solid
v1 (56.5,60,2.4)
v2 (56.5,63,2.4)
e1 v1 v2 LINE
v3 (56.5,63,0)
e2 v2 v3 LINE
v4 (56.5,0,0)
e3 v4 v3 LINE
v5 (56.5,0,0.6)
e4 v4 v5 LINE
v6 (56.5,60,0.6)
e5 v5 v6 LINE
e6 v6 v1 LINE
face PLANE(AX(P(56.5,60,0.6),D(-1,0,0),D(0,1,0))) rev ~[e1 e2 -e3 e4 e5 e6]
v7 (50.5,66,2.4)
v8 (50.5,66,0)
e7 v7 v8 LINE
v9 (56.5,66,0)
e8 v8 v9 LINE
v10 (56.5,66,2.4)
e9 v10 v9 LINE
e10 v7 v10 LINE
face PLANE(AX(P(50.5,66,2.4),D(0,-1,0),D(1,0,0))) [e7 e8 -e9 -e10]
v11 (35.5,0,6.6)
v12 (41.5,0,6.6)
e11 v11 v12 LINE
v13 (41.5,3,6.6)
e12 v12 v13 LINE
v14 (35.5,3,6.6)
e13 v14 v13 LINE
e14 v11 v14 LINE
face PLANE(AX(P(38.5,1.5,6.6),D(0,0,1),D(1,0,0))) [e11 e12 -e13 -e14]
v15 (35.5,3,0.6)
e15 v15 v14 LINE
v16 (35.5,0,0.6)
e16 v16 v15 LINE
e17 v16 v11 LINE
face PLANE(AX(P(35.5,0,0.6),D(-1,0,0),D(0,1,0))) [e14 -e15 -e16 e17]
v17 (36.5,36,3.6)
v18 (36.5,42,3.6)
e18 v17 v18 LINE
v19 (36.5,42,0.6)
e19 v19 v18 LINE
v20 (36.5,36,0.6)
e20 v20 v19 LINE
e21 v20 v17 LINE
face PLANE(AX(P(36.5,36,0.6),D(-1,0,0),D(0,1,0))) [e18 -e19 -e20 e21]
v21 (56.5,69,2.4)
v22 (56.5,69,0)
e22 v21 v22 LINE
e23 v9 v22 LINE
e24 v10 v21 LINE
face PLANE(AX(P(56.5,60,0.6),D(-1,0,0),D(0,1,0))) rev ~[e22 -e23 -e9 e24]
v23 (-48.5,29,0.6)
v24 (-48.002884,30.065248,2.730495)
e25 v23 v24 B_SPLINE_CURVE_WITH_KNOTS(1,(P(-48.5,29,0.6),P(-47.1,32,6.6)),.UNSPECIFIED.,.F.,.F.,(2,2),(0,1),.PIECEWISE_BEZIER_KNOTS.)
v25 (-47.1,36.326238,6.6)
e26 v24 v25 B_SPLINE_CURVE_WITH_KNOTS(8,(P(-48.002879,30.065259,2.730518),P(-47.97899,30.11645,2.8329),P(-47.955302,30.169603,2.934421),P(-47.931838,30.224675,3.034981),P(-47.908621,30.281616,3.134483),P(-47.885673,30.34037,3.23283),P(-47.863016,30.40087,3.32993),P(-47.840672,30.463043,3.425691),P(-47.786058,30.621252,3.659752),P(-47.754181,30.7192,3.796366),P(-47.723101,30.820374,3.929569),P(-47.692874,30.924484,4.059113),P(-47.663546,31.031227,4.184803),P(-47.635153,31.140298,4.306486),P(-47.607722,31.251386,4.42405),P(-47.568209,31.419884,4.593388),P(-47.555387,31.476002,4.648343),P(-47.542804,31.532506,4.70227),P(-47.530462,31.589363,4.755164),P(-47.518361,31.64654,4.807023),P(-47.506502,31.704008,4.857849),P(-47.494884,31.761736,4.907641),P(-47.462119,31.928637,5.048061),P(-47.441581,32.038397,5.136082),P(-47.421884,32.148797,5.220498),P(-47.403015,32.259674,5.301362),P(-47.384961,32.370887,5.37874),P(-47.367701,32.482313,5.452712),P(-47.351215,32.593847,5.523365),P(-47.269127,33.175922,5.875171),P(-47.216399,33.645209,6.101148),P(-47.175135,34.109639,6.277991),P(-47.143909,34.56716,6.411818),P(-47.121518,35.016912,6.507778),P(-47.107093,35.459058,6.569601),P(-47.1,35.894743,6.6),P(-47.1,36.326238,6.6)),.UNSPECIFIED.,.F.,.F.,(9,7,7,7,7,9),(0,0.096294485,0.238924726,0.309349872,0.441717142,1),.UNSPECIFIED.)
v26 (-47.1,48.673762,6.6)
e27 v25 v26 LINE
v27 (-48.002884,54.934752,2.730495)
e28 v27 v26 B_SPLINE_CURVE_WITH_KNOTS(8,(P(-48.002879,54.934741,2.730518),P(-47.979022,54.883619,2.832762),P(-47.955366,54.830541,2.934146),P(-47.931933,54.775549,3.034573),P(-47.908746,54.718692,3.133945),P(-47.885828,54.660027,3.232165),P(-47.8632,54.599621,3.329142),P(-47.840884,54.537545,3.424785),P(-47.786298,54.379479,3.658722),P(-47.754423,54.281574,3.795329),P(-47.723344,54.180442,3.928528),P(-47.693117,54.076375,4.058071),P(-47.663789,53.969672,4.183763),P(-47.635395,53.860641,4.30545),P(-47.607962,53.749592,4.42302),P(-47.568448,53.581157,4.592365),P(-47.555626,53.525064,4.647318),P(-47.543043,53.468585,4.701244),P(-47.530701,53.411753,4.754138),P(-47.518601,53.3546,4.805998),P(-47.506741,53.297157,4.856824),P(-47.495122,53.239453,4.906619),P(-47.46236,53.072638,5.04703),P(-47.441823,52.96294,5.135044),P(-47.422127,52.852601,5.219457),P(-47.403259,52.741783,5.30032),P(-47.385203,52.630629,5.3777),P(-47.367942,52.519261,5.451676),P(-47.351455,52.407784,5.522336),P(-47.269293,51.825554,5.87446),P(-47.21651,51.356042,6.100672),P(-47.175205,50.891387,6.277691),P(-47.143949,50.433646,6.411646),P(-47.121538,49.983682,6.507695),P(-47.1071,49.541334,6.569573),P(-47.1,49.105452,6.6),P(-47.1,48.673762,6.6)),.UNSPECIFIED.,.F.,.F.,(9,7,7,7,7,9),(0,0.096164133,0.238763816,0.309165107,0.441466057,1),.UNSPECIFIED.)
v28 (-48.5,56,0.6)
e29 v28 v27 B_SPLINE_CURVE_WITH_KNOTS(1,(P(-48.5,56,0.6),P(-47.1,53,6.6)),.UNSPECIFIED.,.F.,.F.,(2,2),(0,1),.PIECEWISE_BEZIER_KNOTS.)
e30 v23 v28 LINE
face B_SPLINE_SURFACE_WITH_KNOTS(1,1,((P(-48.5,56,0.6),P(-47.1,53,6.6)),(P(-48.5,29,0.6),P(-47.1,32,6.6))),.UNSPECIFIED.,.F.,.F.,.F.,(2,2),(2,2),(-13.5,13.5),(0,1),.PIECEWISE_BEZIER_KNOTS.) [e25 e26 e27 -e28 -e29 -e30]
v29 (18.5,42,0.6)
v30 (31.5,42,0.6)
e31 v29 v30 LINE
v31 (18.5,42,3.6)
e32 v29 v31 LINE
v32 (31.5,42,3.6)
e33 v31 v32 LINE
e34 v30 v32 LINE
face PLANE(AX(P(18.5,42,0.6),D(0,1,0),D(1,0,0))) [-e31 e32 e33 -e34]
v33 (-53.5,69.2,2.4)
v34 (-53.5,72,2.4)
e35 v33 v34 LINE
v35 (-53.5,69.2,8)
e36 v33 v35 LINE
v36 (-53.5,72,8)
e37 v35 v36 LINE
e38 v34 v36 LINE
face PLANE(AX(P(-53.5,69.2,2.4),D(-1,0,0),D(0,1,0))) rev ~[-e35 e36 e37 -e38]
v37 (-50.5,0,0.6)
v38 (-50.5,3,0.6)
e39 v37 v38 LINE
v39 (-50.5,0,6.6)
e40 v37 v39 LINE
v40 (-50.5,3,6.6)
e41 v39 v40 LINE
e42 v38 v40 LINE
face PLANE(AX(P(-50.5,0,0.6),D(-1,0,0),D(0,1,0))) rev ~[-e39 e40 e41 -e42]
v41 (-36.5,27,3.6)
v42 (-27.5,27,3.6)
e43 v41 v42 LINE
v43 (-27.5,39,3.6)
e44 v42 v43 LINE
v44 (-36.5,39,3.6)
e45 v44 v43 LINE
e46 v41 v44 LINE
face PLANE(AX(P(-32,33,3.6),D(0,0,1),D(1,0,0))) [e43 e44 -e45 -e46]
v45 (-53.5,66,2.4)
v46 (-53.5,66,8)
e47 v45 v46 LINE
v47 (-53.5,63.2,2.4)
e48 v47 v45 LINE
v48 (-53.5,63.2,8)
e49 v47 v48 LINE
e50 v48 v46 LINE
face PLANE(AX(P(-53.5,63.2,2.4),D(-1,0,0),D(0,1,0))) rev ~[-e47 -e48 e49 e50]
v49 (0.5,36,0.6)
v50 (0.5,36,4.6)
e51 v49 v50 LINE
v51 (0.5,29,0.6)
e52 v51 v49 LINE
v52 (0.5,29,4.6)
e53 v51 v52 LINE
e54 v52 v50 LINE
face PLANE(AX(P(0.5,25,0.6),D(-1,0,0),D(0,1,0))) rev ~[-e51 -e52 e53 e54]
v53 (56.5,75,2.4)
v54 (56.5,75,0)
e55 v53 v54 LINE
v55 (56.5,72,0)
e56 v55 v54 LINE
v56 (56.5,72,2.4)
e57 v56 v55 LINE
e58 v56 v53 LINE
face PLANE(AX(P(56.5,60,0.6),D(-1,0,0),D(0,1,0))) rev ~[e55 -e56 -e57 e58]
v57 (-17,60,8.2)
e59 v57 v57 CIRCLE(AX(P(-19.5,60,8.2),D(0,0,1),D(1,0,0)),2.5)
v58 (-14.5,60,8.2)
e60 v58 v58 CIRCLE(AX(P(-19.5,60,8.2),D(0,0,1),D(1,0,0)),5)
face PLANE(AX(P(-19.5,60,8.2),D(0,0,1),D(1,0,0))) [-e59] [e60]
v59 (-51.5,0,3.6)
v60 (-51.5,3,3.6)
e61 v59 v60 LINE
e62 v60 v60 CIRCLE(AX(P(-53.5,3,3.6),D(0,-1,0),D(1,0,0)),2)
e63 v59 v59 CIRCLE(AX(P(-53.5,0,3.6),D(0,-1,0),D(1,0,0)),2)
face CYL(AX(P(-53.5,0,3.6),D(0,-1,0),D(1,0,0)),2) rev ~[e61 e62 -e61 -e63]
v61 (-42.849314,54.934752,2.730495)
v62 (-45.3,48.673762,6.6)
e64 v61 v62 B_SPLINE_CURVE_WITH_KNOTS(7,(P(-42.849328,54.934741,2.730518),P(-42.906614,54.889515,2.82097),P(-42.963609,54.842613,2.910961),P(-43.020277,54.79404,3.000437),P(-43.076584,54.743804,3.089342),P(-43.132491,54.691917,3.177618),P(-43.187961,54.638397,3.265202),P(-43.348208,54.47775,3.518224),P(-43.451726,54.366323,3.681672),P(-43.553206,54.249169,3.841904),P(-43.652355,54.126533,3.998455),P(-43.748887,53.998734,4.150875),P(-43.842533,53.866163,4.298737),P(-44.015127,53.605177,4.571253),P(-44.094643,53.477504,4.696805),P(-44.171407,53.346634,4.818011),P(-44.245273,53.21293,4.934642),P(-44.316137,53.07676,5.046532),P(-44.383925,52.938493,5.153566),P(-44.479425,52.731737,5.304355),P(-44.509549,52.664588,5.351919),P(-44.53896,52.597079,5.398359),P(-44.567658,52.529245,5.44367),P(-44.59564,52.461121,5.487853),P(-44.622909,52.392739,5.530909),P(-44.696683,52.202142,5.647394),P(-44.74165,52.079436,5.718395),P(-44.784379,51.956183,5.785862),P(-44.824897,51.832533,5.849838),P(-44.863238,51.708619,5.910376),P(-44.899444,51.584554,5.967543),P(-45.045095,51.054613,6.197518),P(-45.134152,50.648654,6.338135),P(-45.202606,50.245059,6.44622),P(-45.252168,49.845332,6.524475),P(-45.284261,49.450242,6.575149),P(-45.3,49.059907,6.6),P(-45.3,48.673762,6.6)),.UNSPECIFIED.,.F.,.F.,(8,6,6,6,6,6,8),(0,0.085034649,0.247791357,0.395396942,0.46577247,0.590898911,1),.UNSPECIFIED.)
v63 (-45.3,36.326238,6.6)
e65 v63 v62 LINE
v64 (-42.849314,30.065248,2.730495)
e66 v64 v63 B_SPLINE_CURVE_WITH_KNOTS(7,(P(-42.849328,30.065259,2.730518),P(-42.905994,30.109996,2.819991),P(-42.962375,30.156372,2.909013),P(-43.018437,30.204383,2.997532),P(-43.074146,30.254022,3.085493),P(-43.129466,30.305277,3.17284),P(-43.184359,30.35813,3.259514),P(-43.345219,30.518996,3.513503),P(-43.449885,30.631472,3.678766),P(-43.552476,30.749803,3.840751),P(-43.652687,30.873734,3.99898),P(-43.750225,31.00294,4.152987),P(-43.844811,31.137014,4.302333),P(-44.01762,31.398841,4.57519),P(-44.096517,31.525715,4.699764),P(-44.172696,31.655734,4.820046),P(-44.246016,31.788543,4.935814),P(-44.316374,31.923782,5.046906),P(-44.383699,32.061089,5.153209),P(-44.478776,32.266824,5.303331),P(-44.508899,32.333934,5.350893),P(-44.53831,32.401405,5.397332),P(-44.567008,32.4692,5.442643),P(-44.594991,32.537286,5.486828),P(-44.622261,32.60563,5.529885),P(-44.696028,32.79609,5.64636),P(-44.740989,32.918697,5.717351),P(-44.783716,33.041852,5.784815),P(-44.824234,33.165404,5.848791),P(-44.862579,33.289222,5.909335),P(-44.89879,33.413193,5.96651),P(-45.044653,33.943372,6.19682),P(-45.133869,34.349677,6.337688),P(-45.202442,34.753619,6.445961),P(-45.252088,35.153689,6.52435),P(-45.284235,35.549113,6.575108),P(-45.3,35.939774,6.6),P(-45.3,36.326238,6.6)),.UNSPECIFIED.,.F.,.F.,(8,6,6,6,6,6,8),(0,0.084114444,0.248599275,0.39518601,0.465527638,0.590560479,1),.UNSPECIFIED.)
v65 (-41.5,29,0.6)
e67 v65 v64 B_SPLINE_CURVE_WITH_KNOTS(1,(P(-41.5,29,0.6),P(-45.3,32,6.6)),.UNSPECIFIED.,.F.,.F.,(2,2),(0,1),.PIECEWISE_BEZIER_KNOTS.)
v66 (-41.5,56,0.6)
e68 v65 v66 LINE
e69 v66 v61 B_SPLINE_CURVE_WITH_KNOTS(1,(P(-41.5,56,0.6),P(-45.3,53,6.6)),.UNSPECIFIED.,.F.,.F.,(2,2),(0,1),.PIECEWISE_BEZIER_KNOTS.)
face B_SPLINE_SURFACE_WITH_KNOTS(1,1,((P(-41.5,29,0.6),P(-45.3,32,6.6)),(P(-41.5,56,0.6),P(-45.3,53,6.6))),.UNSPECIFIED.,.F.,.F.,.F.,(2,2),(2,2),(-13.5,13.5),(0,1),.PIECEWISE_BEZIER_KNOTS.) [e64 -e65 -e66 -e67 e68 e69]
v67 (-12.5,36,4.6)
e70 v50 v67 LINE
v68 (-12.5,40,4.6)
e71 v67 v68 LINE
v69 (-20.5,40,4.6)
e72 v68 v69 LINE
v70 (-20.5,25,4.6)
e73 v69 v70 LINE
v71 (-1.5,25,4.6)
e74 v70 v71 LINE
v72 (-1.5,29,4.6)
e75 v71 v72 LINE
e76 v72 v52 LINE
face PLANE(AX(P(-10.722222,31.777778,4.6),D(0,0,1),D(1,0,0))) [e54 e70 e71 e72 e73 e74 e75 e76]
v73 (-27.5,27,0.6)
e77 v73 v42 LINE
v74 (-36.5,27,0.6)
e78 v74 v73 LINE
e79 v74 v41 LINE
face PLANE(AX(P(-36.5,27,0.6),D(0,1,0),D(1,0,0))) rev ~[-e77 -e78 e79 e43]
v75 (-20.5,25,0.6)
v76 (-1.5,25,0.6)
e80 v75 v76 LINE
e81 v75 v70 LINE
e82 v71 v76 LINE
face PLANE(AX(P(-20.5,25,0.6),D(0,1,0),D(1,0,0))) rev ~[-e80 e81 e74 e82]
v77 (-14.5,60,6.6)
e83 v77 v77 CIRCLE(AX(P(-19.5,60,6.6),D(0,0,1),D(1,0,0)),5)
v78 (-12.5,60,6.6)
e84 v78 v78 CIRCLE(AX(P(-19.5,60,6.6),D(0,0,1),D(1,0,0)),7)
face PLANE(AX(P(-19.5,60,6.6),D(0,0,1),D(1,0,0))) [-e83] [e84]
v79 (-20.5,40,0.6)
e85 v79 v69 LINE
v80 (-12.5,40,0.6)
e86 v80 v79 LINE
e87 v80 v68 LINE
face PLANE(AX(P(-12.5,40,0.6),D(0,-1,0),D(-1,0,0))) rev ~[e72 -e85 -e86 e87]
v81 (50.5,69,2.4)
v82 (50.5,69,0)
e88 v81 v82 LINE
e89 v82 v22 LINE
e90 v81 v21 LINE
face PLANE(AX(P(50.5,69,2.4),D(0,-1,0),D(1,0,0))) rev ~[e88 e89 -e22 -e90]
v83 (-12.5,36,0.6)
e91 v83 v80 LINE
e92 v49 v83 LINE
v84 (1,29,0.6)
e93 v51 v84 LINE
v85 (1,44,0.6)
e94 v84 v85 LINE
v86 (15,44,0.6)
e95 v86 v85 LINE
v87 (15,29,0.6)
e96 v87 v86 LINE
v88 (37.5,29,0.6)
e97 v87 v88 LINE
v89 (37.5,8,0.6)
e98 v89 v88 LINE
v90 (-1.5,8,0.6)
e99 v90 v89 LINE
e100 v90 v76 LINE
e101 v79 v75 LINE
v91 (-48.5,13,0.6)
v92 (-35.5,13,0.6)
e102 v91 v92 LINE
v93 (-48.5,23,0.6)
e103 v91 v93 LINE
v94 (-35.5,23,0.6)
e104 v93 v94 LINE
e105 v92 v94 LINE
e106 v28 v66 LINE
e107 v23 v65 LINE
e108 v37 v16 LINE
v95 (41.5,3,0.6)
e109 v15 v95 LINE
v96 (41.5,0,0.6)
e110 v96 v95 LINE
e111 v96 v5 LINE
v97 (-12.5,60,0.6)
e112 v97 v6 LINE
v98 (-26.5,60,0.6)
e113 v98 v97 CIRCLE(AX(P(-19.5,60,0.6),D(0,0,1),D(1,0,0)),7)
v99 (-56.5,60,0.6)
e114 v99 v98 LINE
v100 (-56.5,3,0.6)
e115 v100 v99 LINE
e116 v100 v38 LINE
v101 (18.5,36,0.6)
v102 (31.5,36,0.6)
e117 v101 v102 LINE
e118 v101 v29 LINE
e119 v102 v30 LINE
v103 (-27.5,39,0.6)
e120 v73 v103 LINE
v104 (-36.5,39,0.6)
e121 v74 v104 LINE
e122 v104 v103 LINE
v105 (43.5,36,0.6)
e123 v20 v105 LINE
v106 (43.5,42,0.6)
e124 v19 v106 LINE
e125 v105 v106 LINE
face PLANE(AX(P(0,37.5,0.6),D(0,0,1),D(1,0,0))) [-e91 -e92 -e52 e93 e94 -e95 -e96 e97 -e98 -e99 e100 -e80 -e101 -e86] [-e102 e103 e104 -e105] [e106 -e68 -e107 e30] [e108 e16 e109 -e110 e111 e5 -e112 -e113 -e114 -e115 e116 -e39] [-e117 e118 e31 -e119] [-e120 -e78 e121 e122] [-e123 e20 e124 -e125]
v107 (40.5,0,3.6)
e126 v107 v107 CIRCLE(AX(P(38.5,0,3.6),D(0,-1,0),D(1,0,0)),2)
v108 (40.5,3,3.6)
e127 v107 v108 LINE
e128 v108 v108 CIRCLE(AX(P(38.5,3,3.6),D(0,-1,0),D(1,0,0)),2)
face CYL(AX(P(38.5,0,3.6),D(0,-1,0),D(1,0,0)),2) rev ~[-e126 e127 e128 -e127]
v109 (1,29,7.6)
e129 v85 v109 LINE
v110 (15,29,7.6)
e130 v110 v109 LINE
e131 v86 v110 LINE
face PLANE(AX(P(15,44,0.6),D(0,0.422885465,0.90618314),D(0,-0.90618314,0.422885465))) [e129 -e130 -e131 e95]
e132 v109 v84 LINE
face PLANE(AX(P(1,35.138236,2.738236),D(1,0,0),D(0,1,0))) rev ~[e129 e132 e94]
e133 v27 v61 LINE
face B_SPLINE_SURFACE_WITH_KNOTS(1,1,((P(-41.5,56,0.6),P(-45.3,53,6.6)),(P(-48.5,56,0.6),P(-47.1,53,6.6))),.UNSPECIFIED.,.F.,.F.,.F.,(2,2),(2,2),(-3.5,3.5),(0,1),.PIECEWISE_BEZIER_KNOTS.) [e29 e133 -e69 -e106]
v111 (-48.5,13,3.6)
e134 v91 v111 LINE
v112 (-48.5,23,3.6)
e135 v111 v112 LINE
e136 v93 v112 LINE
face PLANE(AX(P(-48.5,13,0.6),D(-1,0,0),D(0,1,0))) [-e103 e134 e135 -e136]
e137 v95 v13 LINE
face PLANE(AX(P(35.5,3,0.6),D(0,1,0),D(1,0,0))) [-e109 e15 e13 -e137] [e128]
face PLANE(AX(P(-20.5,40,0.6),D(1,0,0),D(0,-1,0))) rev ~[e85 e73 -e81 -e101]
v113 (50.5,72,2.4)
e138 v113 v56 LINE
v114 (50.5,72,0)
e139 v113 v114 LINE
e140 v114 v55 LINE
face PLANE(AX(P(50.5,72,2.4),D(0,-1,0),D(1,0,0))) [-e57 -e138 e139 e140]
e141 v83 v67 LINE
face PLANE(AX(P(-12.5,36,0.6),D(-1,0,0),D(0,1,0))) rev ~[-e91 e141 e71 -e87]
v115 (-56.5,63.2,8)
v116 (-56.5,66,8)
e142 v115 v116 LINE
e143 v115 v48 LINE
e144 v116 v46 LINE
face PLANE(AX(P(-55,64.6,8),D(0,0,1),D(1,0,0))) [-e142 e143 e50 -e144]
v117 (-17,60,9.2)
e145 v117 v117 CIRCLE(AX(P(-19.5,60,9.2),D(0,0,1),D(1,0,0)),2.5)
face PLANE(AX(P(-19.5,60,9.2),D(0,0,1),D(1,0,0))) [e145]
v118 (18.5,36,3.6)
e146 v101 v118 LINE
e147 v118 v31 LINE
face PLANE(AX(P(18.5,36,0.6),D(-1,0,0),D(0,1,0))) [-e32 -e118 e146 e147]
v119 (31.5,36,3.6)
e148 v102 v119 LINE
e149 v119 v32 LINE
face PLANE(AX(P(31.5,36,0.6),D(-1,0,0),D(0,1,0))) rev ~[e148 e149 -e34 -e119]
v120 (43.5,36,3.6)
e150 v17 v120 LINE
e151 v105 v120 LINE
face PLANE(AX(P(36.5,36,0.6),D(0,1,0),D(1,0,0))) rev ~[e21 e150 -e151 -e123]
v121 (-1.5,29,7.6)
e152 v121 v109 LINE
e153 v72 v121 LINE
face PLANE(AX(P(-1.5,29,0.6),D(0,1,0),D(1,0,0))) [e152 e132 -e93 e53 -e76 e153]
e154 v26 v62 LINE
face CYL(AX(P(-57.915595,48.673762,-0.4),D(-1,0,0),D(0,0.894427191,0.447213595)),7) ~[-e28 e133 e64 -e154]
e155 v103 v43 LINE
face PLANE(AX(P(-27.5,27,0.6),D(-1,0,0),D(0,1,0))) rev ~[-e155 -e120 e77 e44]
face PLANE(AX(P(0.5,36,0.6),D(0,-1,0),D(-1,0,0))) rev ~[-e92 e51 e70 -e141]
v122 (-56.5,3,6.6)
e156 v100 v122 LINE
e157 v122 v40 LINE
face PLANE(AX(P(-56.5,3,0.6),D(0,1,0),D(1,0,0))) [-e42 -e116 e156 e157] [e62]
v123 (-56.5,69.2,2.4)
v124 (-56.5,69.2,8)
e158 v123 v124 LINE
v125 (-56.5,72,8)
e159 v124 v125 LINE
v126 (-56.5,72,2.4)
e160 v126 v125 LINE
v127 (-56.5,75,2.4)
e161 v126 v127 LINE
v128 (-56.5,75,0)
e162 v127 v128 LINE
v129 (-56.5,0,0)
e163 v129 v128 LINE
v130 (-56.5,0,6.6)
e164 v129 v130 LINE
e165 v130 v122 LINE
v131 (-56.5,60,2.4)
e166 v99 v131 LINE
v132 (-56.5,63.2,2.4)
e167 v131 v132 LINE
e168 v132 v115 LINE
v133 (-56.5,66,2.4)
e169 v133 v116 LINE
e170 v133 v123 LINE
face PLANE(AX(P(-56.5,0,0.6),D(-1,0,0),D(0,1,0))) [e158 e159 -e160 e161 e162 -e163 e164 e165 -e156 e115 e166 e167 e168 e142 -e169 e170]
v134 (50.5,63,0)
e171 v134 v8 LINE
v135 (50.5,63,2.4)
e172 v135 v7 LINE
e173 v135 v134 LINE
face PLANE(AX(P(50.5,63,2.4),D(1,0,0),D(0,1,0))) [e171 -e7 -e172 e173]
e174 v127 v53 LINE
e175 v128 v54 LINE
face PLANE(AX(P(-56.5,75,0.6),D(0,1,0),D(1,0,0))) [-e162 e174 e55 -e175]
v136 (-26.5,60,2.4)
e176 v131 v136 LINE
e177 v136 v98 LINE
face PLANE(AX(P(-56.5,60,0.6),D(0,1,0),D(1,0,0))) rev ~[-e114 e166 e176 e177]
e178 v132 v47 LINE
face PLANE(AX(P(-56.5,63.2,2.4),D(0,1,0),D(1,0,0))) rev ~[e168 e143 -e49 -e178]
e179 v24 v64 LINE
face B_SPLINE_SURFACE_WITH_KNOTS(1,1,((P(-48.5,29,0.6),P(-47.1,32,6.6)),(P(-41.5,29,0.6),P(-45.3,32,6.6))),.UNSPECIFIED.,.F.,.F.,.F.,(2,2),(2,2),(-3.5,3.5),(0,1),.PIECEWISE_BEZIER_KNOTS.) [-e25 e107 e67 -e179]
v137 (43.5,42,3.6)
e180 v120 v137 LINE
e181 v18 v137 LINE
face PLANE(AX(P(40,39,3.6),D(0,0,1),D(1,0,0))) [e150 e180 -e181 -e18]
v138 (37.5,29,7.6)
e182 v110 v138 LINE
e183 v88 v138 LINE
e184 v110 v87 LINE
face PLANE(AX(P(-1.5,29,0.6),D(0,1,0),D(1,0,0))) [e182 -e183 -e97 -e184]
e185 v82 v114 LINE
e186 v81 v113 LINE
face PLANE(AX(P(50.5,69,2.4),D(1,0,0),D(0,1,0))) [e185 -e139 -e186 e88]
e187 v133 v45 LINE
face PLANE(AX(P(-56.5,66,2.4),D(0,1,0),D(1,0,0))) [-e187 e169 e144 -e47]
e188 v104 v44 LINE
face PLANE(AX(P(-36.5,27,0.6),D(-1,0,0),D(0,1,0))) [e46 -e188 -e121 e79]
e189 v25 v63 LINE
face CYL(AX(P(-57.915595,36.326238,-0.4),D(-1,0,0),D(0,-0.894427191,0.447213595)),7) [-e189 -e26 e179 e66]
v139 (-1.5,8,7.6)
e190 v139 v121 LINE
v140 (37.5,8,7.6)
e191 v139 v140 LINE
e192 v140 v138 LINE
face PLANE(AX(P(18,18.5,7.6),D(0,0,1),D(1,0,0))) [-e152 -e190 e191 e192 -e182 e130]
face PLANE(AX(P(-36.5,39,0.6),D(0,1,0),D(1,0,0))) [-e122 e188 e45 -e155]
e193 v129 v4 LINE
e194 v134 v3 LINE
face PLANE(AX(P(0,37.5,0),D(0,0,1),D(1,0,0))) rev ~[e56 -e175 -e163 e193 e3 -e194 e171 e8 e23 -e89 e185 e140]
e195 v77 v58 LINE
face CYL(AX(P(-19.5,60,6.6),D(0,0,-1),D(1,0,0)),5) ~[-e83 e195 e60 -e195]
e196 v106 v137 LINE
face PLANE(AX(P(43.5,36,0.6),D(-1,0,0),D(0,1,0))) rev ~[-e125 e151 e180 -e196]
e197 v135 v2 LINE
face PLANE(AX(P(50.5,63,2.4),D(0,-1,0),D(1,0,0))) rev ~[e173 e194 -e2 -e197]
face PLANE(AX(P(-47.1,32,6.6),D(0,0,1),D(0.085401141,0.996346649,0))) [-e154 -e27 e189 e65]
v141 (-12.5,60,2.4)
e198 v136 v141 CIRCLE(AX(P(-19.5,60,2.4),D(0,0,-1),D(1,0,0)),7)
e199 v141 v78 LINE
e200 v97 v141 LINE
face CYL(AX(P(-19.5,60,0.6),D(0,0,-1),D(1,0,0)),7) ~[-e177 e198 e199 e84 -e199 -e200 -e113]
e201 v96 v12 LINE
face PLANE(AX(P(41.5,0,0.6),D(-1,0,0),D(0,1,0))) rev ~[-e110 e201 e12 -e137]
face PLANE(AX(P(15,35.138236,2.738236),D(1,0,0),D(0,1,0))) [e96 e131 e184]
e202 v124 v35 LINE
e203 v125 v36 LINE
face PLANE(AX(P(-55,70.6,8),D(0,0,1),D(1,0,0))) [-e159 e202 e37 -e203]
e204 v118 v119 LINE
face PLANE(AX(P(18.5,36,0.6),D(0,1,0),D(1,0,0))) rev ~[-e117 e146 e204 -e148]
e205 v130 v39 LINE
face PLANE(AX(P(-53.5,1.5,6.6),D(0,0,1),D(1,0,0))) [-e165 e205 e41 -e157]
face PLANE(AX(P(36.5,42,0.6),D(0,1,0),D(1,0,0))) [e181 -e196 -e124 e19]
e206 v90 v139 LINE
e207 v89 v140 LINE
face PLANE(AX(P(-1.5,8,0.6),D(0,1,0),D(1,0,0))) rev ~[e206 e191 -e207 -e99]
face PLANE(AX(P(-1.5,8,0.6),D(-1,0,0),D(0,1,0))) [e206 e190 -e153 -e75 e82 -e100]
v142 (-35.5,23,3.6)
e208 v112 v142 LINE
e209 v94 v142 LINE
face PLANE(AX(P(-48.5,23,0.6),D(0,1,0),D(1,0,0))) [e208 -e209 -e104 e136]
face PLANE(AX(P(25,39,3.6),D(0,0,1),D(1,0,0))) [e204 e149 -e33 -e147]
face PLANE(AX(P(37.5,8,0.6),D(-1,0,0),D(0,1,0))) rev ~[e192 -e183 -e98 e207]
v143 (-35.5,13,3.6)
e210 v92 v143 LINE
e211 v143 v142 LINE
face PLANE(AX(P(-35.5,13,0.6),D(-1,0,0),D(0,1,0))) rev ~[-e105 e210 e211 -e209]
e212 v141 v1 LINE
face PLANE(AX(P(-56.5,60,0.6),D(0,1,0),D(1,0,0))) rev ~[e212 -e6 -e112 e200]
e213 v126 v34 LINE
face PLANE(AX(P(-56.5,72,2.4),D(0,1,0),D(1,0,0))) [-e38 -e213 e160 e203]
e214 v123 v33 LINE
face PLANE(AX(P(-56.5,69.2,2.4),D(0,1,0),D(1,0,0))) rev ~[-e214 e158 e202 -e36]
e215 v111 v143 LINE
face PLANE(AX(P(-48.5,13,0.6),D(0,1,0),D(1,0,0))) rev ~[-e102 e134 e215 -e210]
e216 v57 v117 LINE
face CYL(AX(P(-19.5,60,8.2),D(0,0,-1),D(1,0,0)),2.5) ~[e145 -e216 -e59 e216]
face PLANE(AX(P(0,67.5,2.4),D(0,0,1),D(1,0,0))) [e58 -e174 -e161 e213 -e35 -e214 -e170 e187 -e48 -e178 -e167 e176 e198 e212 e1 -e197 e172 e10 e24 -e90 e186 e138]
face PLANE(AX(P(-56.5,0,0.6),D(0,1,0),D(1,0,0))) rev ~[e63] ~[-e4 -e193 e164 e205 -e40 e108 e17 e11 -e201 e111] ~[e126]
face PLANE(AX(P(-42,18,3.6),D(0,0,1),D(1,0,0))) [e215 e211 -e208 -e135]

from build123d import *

# Parameters (mm, degrees)
F0_W         = 113
F0_H         = 75
F1_DEPTH     = 0.6
F2_W         = 113
F2_H         = 15
F3_DEPTH     = 1.8
F4_R         = 7
F5_DEPTH     = 6
F6_R         = 5
F7_DEPTH     = 1.6
F8_R         = 2.5
F9_DEPTH     = 1
F10_W        = 13
F10_H        = 10
F10_W_2      = 9
F10_H_2      = 12
F10_H_3      = 6
F10_W_3      = 7
F11_DEPTH    = 3
F13_W        = 39
F13_H        = 21
F14_DEPTH    = 7
F15_DEPTH    = 4
F18_DEPTH    = 14
F19_W        = 7
F19_H        = 27
F21_W        = 1.8
F21_H        = 21
F23_T1_DEPTH = 23.4311896062
F23_T6_DEPTH = 23.4311896062
F24_W        = 3
F24_H        = 2.8
F25_DEPTH    = 5.6
F26_W        = 6
F26_H        = 3
F27_DEPTH    = 3
F28_W        = 6
F28_H        = 3
F29_DEPTH    = 6
F30_R        = 2
F31_DEPTH    = 4


# Not quite as in the source:
# - a fillet or chamfer that OpenCascade refuses, or shapes differently, is made with other operations: its cross-section is extruded or revolved along the edge and cut away or added


with BuildPart() as f1:
    # F0 (on Top) → F1 (new body)
    with BuildSketch(Plane.XY):
        with Locations((0, 37.5)):
            Rectangle(F0_W, F0_H)
    extrude(amount=F1_DEPTH)

    # F2 (on face) → F3 (join)
    with BuildSketch(Plane.XY.offset(0.6)):
        with Locations((0, 67.5)):
            Rectangle(F2_W, F2_H)
    extrude(amount=F3_DEPTH)

    # F4 (on face) → F5 (join)
    with BuildSketch(Plane.XY.offset(0.6)):
        with Locations((-19.5, 60)):
            Circle(F4_R)
    extrude(amount=F5_DEPTH)

    # F6 (on face) → F7 (join)
    with BuildSketch(Plane.XY.offset(6.6)):
        with Locations((-19.5, 60)):
            Circle(F6_R)
    extrude(amount=F7_DEPTH)

    # F8 (on face) → F9 (join)
    with BuildSketch(Plane.XY.offset(8.2)):
        with Locations((-19.5, 60)):
            Circle(F8_R)
    extrude(amount=F9_DEPTH)

    # F10 (on face) → F11 (join)
    with BuildSketch(Plane.XY.offset(0.6)):
        with Locations((-42, 18)):
            Rectangle(F10_W, F10_H)
        with Locations((-32, 33)):
            Rectangle(F10_W_2, F10_H_2)
        with Locations((25, 39)):
            Rectangle(F10_W, F10_H_3)
        with Locations((40, 39)):
            Rectangle(F10_W_3, F10_H_3)
    extrude(amount=F11_DEPTH)

    # F13 (on face) → F14 (join)
    with BuildSketch(Plane.XY.offset(0.6)):
        with Locations((18, 18.5)):
            Rectangle(F13_W, F13_H)
    extrude(amount=F14_DEPTH)

    # F12 (on face) → F15 (join)
    with BuildSketch(Plane.XY.offset(0.6)):
        Polygon((-12.5, 40), (-20.5, 40), (-20.5, 25), (0.5, 25), (0.5, 36), (-12.5, 36), align=None)
    extrude(amount=F15_DEPTH)

    # F17 (on offset) → F18 (join)
    with BuildSketch(Plane.YZ.offset(15)):
        Polygon((29, 0.6), (44, 0.6), (29, 7.6), align=None)
    extrude(amount=-F18_DEPTH)

    # F19 (on face) → F22 section 0
    with BuildSketch(Plane.XY.offset(0.6)):
        with Locations((-45, 42.5)):
            Rectangle(F19_W, F19_H)
    # F21 (on offset) → F22 section 1
    with BuildSketch(Plane.XY.offset(6.6)):
        with Locations((-46.2, 42.5)):
            Rectangle(F21_W, F21_H)
    loft()

    # F23: fillet of radius 7 on 2 edges, made by hand

    # F23_s2 → F23_t1 (cut)
    with BuildSketch(Plane.YZ.offset(-57.9155948031)):
        with BuildLine():
            ThreePointArc((54.9347524158, 2.7304951685), (52.3538798636, 5.5545556585), (48.6737620788, 6.6))
            Line((48.6737620788, 6.6), (53, 6.6))
            Line((53, 6.6), (54.9347524158, 2.7304951685))
        make_face()
    extrude(amount=F23_T1_DEPTH, mode=Mode.SUBTRACT)


with BuildPart() as f23_tool4:
    # F23_s5 → F23_t6 (new body)
    with BuildSketch(Plane.YZ.offset(-57.9155948031)):
        with BuildLine():
            ThreePointArc((30.0652475842, 2.7304951685), (32.6461201364, 5.5545556585), (36.3262379212, 6.6))
            Line((36.3262379212, 6.6), (32, 6.6))
            Line((32, 6.6), (30.0652475842, 2.7304951685))
        make_face()
    extrude(amount=F23_T6_DEPTH)

    split(bisect_by=Plane.YZ.offset(-36.5), keep=Keep.BOTTOM)


with BuildPart() as f1_1:
    add(f1.part)

    # F23_t3: cut F23_tool4
    add(f23_tool4.part, mode=Mode.SUBTRACT)

    # F24 (on face) → F25 (join)
    with BuildSketch(Plane.XY.offset(2.4)):
        with Locations((-55, 70.6)):
            Rectangle(F24_W, F24_H)
        with Locations((-55, 64.6)):
            Rectangle(F24_W, F24_H)
    extrude(amount=F25_DEPTH)

    # F26 (on face) → F27 (cut)
    with BuildSketch(Plane.XY.offset(2.4)):
        with Locations((53.5, 70.5)):
            Rectangle(F26_W, F26_H)
        with Locations((53.5, 64.5)):
            Rectangle(F26_W, F26_H)
    extrude(amount=-F27_DEPTH, mode=Mode.SUBTRACT)

    # F28 (on face) → F29 (join)
    with BuildSketch(Plane.XY.offset(0.6)):
        with Locations((-53.5, 1.5)):
            Rectangle(F28_W, F28_H)
        with Locations((38.5, 1.5)):
            Rectangle(F28_W, F28_H)
    extrude(amount=F29_DEPTH)

    # F30 (on face) → F31 (cut)
    with BuildSketch(Plane.XZ):
        with Locations((-53.5, 3.6)):
            Circle(F30_R)
        with Locations((38.5, 3.6)):
            Circle(F30_R)
    extrude(amount=-F31_DEPTH, mode=Mode.SUBTRACT)


solid = f1_1.part
